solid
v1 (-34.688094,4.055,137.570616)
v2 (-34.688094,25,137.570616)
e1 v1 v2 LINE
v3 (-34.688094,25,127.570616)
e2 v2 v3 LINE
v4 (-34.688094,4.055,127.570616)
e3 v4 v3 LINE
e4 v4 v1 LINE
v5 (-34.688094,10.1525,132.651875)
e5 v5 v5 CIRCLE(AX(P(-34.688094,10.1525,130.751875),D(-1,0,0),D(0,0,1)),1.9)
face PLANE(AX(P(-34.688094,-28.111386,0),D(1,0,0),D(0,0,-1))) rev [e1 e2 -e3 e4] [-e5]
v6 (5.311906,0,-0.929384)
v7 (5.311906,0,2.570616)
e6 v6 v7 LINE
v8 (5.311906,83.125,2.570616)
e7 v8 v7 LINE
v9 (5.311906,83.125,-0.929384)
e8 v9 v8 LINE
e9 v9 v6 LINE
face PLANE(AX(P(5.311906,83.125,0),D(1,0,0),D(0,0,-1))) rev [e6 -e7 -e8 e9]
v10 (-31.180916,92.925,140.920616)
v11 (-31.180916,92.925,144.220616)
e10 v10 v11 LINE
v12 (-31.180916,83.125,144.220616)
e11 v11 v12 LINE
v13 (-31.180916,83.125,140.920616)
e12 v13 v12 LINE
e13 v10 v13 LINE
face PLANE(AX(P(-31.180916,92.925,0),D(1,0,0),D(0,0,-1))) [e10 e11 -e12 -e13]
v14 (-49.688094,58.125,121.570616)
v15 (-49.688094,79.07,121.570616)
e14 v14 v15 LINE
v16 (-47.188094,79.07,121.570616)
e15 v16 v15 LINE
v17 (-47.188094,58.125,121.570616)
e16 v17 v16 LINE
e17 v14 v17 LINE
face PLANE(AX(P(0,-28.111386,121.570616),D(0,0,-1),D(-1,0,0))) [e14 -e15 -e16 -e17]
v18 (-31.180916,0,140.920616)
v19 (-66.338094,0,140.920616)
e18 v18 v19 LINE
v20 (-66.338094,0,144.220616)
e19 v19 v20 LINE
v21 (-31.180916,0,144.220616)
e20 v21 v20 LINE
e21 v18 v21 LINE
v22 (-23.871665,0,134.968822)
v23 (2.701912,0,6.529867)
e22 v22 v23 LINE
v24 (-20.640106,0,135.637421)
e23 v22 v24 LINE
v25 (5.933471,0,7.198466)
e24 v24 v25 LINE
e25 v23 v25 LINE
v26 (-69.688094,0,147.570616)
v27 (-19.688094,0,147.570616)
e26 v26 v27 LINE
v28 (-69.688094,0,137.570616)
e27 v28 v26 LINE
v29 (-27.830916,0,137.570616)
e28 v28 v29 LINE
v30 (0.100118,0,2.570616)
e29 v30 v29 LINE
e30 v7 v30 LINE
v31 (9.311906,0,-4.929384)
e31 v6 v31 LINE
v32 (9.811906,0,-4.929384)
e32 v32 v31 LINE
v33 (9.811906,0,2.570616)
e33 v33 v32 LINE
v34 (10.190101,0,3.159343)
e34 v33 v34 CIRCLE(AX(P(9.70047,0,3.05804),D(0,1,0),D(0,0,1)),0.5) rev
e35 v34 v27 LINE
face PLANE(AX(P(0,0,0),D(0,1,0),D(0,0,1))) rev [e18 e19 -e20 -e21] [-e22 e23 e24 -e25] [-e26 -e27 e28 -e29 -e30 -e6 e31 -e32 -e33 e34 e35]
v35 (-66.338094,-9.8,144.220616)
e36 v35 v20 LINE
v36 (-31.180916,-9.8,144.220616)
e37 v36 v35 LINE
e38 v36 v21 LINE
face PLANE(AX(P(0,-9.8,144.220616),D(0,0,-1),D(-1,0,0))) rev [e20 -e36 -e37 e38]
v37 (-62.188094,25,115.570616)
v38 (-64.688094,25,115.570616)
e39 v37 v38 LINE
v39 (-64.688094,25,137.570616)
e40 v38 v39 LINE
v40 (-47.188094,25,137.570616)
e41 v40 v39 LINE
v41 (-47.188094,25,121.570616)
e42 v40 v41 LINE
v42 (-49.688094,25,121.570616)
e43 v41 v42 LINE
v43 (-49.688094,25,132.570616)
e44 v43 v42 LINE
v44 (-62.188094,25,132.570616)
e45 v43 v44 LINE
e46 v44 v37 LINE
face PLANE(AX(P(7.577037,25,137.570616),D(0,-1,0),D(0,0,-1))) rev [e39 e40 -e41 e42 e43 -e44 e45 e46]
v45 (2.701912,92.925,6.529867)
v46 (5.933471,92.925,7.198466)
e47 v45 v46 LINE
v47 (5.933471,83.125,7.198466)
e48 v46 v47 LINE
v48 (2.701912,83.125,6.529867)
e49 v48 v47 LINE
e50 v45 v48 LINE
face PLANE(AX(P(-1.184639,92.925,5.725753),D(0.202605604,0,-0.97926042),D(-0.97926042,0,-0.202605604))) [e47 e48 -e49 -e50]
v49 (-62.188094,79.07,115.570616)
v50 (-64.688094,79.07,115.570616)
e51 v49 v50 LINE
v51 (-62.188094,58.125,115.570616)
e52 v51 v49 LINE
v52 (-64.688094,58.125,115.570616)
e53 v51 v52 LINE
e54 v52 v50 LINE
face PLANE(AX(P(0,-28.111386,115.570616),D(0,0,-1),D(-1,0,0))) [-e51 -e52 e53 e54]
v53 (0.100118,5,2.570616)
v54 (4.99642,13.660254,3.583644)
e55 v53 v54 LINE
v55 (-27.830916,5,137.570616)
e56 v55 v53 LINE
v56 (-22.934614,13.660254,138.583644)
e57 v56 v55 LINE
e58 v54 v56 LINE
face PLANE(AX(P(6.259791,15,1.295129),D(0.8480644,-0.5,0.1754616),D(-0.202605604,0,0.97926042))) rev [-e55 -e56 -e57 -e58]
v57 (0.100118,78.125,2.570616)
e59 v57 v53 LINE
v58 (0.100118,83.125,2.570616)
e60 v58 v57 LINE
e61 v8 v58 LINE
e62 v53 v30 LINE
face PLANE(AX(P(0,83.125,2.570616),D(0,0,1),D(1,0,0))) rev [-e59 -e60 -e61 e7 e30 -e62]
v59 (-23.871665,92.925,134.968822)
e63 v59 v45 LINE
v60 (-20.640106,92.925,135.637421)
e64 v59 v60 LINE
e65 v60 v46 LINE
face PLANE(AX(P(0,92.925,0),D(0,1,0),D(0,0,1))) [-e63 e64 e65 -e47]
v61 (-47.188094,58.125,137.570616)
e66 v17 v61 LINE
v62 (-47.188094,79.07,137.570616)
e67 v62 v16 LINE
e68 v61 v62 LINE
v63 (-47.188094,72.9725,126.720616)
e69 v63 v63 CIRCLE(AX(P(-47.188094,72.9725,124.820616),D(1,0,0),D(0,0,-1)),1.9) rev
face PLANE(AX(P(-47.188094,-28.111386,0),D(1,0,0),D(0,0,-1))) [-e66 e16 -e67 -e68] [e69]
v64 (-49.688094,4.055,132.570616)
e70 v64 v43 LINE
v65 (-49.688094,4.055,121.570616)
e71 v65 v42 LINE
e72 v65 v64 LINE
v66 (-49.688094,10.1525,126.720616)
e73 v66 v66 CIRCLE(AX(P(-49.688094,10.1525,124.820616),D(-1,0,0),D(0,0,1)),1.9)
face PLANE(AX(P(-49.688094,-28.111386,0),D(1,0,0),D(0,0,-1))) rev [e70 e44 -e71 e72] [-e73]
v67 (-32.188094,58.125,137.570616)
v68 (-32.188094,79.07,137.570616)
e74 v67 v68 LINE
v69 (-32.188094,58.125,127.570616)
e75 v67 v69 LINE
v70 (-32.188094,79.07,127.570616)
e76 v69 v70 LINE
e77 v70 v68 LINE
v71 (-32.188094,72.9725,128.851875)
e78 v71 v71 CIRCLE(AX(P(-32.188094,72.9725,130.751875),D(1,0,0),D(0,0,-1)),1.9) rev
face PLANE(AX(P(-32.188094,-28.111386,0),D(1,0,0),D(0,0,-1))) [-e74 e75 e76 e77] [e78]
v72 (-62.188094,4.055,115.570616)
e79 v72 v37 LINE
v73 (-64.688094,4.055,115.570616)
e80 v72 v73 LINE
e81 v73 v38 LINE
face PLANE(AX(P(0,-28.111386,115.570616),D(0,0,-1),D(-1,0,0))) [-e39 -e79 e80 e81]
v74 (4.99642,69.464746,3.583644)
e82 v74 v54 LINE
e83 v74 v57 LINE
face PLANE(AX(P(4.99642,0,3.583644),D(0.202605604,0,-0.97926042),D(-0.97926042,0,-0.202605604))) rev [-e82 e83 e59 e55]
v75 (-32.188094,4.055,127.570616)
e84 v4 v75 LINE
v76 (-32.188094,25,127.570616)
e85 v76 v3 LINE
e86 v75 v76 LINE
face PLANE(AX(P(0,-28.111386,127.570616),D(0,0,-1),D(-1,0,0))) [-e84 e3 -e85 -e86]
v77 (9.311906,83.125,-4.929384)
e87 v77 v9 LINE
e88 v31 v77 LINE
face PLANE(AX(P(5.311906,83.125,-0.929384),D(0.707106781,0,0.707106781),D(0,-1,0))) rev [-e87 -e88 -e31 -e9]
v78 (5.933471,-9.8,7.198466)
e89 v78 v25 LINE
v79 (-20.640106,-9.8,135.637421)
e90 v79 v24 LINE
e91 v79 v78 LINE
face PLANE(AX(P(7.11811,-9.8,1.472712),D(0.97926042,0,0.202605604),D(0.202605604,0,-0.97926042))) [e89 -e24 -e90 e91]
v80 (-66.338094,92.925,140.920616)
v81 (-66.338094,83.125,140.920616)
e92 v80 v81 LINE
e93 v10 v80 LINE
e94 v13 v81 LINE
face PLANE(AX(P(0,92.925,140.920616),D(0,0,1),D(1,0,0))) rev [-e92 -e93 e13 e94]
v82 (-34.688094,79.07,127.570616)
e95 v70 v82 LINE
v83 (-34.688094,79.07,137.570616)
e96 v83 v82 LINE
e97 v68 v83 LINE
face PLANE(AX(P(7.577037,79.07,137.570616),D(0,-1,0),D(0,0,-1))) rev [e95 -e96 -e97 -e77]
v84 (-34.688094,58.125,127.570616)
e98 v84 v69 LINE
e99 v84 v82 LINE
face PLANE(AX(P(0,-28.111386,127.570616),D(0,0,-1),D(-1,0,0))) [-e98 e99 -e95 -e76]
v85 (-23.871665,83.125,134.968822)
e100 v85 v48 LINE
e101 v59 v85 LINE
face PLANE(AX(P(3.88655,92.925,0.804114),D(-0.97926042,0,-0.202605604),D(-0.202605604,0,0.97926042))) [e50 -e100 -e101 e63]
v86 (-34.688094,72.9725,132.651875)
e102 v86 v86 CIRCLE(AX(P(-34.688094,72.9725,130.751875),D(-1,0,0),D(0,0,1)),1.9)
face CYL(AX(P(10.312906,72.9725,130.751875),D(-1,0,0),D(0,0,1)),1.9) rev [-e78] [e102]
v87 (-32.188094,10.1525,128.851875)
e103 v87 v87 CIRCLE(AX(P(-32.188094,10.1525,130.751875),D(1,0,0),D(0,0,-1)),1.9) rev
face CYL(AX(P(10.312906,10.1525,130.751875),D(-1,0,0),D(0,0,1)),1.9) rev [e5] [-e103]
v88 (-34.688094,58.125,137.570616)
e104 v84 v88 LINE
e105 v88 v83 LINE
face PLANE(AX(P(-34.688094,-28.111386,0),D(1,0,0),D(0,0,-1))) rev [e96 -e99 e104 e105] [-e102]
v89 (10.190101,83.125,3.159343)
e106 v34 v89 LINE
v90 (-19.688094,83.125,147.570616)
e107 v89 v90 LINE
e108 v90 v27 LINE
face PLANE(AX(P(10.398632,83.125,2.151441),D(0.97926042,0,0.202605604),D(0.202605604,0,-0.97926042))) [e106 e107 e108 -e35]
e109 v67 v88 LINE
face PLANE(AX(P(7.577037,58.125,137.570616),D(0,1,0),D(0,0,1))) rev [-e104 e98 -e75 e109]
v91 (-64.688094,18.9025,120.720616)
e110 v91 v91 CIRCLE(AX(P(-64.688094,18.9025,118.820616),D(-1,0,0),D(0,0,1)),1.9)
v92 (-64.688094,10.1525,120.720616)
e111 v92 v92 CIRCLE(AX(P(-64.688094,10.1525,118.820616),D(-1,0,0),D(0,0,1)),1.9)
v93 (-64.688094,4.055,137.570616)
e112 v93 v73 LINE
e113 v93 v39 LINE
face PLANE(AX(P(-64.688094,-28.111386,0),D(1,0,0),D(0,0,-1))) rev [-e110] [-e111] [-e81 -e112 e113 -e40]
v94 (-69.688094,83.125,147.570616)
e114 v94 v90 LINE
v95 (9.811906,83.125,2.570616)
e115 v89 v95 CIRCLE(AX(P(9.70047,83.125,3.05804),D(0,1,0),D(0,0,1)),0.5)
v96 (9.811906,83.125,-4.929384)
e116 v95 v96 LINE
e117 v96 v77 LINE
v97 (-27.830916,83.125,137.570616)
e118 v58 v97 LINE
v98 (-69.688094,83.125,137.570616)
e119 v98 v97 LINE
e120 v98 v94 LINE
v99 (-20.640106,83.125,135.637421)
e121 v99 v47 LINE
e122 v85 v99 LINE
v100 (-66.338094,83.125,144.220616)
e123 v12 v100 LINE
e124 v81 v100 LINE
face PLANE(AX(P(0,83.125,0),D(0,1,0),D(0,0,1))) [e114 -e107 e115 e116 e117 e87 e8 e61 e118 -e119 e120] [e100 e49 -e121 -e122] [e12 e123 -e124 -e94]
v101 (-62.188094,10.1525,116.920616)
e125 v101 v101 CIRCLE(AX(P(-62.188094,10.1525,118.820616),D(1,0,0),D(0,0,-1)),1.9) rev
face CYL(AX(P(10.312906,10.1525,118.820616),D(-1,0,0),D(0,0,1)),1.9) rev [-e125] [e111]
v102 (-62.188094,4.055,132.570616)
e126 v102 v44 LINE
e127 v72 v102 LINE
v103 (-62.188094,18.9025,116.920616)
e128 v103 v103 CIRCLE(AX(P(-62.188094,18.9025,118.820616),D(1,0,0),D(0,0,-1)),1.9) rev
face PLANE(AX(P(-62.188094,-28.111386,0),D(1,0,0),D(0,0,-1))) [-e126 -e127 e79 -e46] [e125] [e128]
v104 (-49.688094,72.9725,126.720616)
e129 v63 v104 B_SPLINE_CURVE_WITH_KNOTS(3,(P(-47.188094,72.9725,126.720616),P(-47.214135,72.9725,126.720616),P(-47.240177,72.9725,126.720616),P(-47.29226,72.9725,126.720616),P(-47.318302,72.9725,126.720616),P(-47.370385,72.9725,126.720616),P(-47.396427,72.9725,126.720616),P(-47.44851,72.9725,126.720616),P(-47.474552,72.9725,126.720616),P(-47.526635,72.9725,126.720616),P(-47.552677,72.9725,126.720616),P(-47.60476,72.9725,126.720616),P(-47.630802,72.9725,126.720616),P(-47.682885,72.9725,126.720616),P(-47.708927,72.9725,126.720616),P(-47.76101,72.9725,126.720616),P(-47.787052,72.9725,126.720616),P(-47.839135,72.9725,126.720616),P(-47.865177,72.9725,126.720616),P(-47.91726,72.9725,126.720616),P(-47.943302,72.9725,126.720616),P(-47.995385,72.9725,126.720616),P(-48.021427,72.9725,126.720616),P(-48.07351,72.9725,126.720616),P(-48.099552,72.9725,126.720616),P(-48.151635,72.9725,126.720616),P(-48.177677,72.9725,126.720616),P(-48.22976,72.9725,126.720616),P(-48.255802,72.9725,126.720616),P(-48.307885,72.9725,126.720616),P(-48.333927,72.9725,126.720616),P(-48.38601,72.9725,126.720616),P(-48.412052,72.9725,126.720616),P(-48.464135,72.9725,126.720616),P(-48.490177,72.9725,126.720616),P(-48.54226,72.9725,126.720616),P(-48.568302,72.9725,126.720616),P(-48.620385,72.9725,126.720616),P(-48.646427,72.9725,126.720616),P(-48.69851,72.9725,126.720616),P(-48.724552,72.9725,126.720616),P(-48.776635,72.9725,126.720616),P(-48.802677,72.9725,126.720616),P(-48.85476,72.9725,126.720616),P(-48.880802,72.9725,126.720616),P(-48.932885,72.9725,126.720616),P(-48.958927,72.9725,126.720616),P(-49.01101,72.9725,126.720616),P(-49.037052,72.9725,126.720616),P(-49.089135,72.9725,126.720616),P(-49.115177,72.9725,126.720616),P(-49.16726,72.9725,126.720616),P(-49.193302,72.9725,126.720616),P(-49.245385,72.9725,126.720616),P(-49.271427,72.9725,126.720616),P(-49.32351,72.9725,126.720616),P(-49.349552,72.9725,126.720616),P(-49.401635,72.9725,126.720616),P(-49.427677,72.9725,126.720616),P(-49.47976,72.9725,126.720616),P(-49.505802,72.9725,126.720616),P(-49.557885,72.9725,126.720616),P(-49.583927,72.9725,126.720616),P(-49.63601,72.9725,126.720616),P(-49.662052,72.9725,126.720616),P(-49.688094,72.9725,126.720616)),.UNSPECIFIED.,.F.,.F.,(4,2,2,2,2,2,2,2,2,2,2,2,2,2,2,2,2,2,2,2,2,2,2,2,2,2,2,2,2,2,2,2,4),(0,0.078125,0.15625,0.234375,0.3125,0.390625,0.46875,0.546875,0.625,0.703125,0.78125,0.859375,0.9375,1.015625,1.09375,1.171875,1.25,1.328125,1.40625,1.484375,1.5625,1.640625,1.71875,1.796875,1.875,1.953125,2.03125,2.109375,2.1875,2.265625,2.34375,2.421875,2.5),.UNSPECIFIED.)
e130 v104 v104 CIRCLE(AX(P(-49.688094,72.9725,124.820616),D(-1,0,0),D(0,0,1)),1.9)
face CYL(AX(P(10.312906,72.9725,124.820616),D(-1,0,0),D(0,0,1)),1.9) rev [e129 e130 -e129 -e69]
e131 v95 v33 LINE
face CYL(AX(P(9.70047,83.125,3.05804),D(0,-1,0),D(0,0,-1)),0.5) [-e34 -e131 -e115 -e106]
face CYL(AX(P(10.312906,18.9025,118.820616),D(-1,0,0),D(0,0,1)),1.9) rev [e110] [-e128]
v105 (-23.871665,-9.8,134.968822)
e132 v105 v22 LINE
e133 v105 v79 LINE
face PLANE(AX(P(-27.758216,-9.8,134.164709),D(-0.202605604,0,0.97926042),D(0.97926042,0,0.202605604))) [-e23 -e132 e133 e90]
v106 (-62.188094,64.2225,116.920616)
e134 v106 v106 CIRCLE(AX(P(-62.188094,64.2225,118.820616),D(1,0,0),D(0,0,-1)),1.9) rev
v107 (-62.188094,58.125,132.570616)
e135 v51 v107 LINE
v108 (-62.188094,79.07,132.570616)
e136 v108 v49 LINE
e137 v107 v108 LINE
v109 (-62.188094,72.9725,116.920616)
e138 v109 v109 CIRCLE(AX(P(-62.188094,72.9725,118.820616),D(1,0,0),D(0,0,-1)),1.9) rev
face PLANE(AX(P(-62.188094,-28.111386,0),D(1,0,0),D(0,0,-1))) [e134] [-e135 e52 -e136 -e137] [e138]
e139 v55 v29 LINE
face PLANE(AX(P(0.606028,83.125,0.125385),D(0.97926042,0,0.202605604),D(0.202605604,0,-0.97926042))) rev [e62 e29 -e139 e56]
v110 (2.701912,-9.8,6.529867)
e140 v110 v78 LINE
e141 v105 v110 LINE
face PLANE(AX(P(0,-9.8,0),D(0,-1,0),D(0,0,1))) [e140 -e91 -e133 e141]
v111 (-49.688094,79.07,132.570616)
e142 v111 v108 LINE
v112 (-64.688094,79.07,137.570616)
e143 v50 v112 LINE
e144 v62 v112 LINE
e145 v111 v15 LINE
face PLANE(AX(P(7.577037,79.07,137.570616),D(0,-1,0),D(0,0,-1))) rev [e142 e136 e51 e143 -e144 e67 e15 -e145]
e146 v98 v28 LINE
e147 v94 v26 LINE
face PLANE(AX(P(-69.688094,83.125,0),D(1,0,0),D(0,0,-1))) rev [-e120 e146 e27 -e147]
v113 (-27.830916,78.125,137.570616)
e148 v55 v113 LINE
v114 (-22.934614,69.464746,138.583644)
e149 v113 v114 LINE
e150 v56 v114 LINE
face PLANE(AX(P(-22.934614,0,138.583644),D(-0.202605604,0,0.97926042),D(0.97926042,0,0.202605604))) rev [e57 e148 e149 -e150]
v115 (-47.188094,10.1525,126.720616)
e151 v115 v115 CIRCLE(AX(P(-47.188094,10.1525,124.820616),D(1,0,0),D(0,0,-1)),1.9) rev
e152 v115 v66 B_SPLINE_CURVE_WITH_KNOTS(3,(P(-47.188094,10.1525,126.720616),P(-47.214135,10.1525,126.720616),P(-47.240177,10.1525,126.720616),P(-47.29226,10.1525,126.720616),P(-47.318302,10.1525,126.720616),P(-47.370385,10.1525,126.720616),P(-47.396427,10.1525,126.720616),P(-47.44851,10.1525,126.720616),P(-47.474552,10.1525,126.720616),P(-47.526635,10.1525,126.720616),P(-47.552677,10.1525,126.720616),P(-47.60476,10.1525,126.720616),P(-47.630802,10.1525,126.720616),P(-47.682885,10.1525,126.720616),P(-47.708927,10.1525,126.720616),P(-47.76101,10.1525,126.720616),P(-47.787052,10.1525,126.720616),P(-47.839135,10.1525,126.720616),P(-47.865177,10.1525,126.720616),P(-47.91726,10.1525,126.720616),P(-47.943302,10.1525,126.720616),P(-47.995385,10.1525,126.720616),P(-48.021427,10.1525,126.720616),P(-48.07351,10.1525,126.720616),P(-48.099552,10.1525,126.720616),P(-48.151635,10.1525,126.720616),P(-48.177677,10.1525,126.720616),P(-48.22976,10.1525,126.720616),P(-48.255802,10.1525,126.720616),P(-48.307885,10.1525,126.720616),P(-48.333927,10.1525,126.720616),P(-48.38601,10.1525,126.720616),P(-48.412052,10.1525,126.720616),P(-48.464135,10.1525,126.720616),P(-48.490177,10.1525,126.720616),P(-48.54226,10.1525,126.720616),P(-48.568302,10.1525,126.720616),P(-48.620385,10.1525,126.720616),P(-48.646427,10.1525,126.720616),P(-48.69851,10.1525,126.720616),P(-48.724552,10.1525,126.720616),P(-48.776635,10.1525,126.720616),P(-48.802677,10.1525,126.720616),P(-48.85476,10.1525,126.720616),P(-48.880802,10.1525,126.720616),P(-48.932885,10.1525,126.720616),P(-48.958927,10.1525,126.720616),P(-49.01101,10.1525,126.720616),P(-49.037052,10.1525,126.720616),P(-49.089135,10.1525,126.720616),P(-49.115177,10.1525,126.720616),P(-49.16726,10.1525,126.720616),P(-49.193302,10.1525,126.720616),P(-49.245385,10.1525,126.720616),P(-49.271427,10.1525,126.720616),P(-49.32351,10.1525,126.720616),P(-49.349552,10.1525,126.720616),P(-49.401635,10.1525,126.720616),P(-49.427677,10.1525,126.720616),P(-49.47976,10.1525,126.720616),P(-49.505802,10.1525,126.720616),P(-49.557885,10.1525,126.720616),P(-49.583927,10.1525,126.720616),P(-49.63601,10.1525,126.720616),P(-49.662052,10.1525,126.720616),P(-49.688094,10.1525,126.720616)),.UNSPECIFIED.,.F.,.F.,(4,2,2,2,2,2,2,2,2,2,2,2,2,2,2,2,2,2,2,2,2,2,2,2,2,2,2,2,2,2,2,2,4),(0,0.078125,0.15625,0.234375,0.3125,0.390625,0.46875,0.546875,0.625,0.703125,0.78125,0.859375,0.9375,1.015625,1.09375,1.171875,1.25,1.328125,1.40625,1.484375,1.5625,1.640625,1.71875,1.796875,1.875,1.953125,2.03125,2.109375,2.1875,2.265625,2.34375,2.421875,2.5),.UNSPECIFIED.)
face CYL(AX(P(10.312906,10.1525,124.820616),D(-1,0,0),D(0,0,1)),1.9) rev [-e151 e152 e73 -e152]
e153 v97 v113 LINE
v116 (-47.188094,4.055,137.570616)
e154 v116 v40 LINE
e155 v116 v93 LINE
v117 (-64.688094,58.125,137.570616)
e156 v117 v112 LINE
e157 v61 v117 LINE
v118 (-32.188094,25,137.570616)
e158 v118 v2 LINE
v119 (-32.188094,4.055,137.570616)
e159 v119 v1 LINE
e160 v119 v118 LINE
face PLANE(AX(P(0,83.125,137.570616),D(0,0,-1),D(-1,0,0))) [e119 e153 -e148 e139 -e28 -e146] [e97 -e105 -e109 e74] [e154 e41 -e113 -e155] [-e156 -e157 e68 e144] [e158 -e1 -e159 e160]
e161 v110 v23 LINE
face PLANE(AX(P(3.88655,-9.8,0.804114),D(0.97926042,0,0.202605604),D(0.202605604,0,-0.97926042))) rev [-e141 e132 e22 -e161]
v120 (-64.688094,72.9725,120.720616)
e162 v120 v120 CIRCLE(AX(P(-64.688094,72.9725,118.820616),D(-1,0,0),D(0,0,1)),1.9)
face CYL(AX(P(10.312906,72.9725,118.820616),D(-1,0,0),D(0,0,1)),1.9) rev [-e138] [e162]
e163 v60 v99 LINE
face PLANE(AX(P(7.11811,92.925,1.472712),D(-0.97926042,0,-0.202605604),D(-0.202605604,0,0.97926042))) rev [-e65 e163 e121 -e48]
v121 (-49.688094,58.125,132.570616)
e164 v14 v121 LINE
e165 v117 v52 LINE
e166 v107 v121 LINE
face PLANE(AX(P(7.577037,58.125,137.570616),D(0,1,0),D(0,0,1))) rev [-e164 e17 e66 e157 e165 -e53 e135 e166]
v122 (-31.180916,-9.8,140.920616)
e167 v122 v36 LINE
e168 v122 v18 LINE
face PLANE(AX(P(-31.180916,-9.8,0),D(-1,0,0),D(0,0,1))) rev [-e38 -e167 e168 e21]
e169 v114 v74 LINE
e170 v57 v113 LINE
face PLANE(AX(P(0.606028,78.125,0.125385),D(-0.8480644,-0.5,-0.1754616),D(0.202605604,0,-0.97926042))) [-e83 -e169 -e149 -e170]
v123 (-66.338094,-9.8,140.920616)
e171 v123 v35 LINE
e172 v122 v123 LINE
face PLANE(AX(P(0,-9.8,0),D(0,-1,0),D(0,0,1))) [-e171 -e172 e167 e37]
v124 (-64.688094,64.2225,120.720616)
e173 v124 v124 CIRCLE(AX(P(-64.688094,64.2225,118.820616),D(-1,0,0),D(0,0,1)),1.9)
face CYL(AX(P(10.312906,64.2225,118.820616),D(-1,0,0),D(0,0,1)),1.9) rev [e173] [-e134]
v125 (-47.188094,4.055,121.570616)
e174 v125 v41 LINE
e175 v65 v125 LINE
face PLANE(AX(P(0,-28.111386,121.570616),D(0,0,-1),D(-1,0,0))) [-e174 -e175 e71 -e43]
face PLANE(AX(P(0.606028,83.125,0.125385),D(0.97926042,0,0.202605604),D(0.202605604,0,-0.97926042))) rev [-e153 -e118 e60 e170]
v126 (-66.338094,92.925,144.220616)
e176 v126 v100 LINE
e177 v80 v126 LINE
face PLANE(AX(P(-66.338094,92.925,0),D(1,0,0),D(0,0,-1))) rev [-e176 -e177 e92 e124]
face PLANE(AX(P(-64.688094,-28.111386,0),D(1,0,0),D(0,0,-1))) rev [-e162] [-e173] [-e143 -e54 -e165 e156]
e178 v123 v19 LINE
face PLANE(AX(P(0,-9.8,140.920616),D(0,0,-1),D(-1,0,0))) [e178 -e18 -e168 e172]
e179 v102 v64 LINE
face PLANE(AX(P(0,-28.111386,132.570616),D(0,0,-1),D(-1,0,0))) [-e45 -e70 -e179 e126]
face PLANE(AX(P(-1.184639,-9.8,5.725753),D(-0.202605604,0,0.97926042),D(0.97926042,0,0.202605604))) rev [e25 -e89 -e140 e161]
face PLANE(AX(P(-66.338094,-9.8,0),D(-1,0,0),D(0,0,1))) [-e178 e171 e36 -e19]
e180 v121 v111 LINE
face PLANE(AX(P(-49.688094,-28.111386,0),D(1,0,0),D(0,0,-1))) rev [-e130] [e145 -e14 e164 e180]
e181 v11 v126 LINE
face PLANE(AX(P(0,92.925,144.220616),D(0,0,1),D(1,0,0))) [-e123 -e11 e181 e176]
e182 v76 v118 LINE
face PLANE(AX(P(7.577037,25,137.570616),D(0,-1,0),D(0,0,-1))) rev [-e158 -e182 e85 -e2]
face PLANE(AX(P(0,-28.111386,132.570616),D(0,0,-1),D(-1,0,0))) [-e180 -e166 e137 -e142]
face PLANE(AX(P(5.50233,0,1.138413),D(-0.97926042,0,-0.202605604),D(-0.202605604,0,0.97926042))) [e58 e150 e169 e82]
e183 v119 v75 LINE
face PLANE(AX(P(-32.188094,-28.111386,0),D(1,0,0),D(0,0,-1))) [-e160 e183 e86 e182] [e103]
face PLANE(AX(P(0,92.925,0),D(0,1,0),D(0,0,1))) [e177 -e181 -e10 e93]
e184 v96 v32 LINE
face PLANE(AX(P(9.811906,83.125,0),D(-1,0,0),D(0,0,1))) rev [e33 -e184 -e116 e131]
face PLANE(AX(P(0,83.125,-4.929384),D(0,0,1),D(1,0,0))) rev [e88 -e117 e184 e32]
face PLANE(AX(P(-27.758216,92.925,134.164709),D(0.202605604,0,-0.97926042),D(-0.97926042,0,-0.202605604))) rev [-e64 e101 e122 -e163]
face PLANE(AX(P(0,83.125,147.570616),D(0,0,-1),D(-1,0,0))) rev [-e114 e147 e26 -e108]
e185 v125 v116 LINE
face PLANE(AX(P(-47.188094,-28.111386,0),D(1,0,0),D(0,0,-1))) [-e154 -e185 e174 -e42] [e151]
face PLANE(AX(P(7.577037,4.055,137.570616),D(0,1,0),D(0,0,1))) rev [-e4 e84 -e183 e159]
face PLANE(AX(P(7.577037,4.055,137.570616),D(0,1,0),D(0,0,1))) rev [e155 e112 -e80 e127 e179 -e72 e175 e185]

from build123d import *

# Parameters (mm, degrees)
BOSS_EXTRUDE1_DEPTH = 83.125
SKETCH2_W           = 35.157177314
SKETCH2_H           = 3.3
BOSS_EXTRUDE2_DEPTH = 9.8
SKETCH7_W           = 2.5
SKETCH7_H           = 10
BOSS_EXTRUDE4_DEPTH = 83.125
CUT_EXTRUDE5_REACH  = 186.424
SKETCH8_R           = 1.9
CUT_EXTRUDE6_REACH  = 191.835
SKETCH9_R           = 1.9
CUT_EXTRUDE9_REACH  = 182.103
SKETCH12_R          = 1.9
CUT_EXTRUDE7_REACH  = 191.835
SKETCH10_W          = 33.125
SKETCH10_H          = 22
SKETCH10_W_2        = 4.055
SKETCH11_W          = 53.125
SKETCH11_H          = 124.429937858
SKETCH11_H_2        = 13.429202889
CUT_EXTRUDE8_DEPTH  = 5
CHAMFER1_SIZE       = 4
FILLET1_R           = 0.5
CHAMFER2_SIZE       = 10
CHAMFER2_SIZE_2     = 5.773502692


with BuildPart() as part:
    # Sketch1 → Boss-Extrude1 (new body)
    with BuildSketch(Plane(origin=(0, 0, 0), x_dir=(-1, 0, 0), z_dir=(0, 1, 0))):
        Polygon((19.688093764, 147.570616058), (-10.311906236, 2.570616058), (-9.811906236, 2.570616058), (-9.811906236, -4.929383942), (-5.311906236, -4.929383942), (-5.311906236, 2.570616058), (-0.100118033, 2.570616058), (27.83091645, 137.570616058), (69.688093764, 137.570616058), (69.688093764, 147.570616058), align=None)
    extrude(amount=BOSS_EXTRUDE1_DEPTH)

    # Sketch2 → Boss-Extrude2 (add)
    with BuildSketch(Plane(origin=(0, 83.125, 0), x_dir=(-1, 0, 0), z_dir=(0, 1, 0))):
        Polygon((23.871665271, 134.968822427), (-2.701911664, 6.529867237), (-5.933471049, 7.198465731), (20.640105887, 135.63742092), align=None)
        with Locations((48.759505107, 142.570616058)):
            Rectangle(SKETCH2_W, SKETCH2_H)
    boss_extrude2 = extrude(amount=BOSS_EXTRUDE2_DEPTH)

    # Mirror1: Boss-Extrude2 across plane
    add(boss_extrude2.mirror(Plane.ZX.offset(41.5625)))

    # Sketch7 → Boss-Extrude4 (add)
    with BuildSketch(Plane(origin=(0, 83.125, 0), x_dir=(-1, 0, 0), z_dir=(0, 1, 0))):
        Polygon((64.688093764, 137.570616058), (47.188093764, 137.570616058), (47.188093764, 121.570616058), (49.688093764, 121.570616058), (49.688093764, 132.570616058), (62.188093764, 132.570616058), (62.188093764, 115.570616058), (64.688093764, 115.570616058), align=None)
        with Locations((33.438093764, 132.570616058)):
            Rectangle(SKETCH7_W, SKETCH7_H)
    extrude(amount=-BOSS_EXTRUDE4_DEPTH)

    # Sketch8 → Cut-Extrude5 (cut, up to next)
    with BuildSketch(Plane(origin=(-49.688093764, 0, 0), x_dir=(0, -1, 0), z_dir=(-1, 0, 0)), mode=Mode.PRIVATE) as cut_extrude5_sk1:
        with Locations(Location((-72.9725, 124.820616058, 0), (0, 0, 90))):
            Circle(SKETCH8_R)
    cut_extrude5_tool1 = extrude(cut_extrude5_sk1.sketch, amount=-CUT_EXTRUDE5_REACH, mode=Mode.PRIVATE) & part.part
    # Sketch8 → Cut-Extrude5 (cut, up to next)
    with BuildSketch(Plane(origin=(-49.688093764, 0, 0), x_dir=(0, -1, 0), z_dir=(-1, 0, 0)), mode=Mode.PRIVATE) as cut_extrude5_sk2:
        with Locations(Location((-10.1525, 124.820616058, 0), (0, 0, 90))):
            Circle(SKETCH8_R)
    cut_extrude5_tool2 = extrude(cut_extrude5_sk2.sketch, amount=-CUT_EXTRUDE5_REACH, mode=Mode.PRIVATE) & part.part
    add(cut_extrude5_tool1.solids().sort_by_distance((-49.688094, 72.9725, 124.820616))[0], mode=Mode.SUBTRACT)
    add(cut_extrude5_tool2.solids().sort_by_distance((-49.688094, 10.1525, 124.820616))[0], mode=Mode.SUBTRACT)

    # Sketch9 → Cut-Extrude6 (cut, up to next)
    with BuildSketch(Plane(origin=(-64.688093764, 0, 0), x_dir=(0, -1, 0), z_dir=(-1, 0, 0)), mode=Mode.PRIVATE) as cut_extrude6_sk1:
        with Locations(Location((-72.9725, 118.820616058, 0), (0, 0, 90))):
            Circle(SKETCH9_R)
    cut_extrude6_tool1 = extrude(cut_extrude6_sk1.sketch, amount=-CUT_EXTRUDE6_REACH, mode=Mode.PRIVATE) & part.part
    # Sketch9 → Cut-Extrude6 (cut, up to next)
    with BuildSketch(Plane(origin=(-64.688093764, 0, 0), x_dir=(0, -1, 0), z_dir=(-1, 0, 0)), mode=Mode.PRIVATE) as cut_extrude6_sk2:
        with Locations(Location((-18.9025, 118.820616058, 0), (0, 0, 90))):
            Circle(SKETCH9_R)
    cut_extrude6_tool2 = extrude(cut_extrude6_sk2.sketch, amount=-CUT_EXTRUDE6_REACH, mode=Mode.PRIVATE) & part.part
    # Sketch9 → Cut-Extrude6 (cut, up to next)
    with BuildSketch(Plane(origin=(-64.688093764, 0, 0), x_dir=(0, -1, 0), z_dir=(-1, 0, 0)), mode=Mode.PRIVATE) as cut_extrude6_sk3:
        with Locations(Location((-10.1525, 118.820616058, 0), (0, 0, 90))):
            Circle(SKETCH9_R)
    cut_extrude6_tool3 = extrude(cut_extrude6_sk3.sketch, amount=-CUT_EXTRUDE6_REACH, mode=Mode.PRIVATE) & part.part
    # Sketch9 → Cut-Extrude6 (cut, up to next)
    with BuildSketch(Plane(origin=(-64.688093764, 0, 0), x_dir=(0, -1, 0), z_dir=(-1, 0, 0)), mode=Mode.PRIVATE) as cut_extrude6_sk4:
        with Locations(Location((-64.2225, 118.820616058, 0), (0, 0, 90))):
            Circle(SKETCH9_R)
    cut_extrude6_tool4 = extrude(cut_extrude6_sk4.sketch, amount=-CUT_EXTRUDE6_REACH, mode=Mode.PRIVATE) & part.part
    add(cut_extrude6_tool1.solids().sort_by_distance((-64.688094, 72.9725, 118.820616))[0], mode=Mode.SUBTRACT)
    add(cut_extrude6_tool2.solids().sort_by_distance((-64.688094, 18.9025, 118.820616))[0], mode=Mode.SUBTRACT)
    add(cut_extrude6_tool3.solids().sort_by_distance((-64.688094, 10.1525, 118.820616))[0], mode=Mode.SUBTRACT)
    add(cut_extrude6_tool4.solids().sort_by_distance((-64.688094, 64.2225, 118.820616))[0], mode=Mode.SUBTRACT)

    # Sketch12 → Cut-Extrude9 (cut, up to next)
    with BuildSketch(Plane(origin=(-34.688093764, 0, 0), x_dir=(0, -1, 0), z_dir=(-1, 0, 0)), mode=Mode.PRIVATE) as cut_extrude9_sk1:
        with Locations(Location((-72.9725, 130.751875225, 0), (0, 0, 90))):
            Circle(SKETCH12_R)
    cut_extrude9_tool1 = extrude(cut_extrude9_sk1.sketch, amount=-CUT_EXTRUDE9_REACH, mode=Mode.PRIVATE) & part.part
    # Sketch12 → Cut-Extrude9 (cut, up to next)
    with BuildSketch(Plane(origin=(-34.688093764, 0, 0), x_dir=(0, -1, 0), z_dir=(-1, 0, 0)), mode=Mode.PRIVATE) as cut_extrude9_sk2:
        with Locations(Location((-10.1525, 130.751875225, 0), (0, 0, 90))):
            Circle(SKETCH12_R)
    cut_extrude9_tool2 = extrude(cut_extrude9_sk2.sketch, amount=-CUT_EXTRUDE9_REACH, mode=Mode.PRIVATE) & part.part
    add(cut_extrude9_tool1.solids().sort_by_distance((-34.688094, 72.9725, 130.751875))[0], mode=Mode.SUBTRACT)
    add(cut_extrude9_tool2.solids().sort_by_distance((-34.688094, 10.1525, 130.751875))[0], mode=Mode.SUBTRACT)

    # Cut-Extrude7: up to this face of the body (flat: up to its plane)
    cut_extrude7_end = Plane(part.part.faces().sort_by_distance((-32.188093764, 41.5625, 132.621636181))[0])
    # Sketch10 → Cut-Extrude7 (cut, up to the picked face)
    with BuildSketch(Plane(origin=(-64.688093764, 0, 0), x_dir=(0, -1, 0), z_dir=(-1, 0, 0)), mode=Mode.PRIVATE) as cut_extrude7_sk1:
        with Locations((-41.5625, 126.570616058)):
            Rectangle(SKETCH10_W, SKETCH10_H)
    cut_extrude7_tool1 = split(extrude(cut_extrude7_sk1.sketch, amount=-CUT_EXTRUDE7_REACH, mode=Mode.PRIVATE), bisect_by=cut_extrude7_end, keep=Keep.BOTH, mode=Mode.PRIVATE)
    # Sketch10 → Cut-Extrude7 (cut, up to the picked face)
    with BuildSketch(Plane(origin=(-64.688093764, 0, 0), x_dir=(0, -1, 0), z_dir=(-1, 0, 0)), mode=Mode.PRIVATE) as cut_extrude7_sk2:
        with Locations((-81.0975, 126.570616058)):
            Rectangle(SKETCH10_W_2, SKETCH10_H)
    cut_extrude7_tool2 = split(extrude(cut_extrude7_sk2.sketch, amount=-CUT_EXTRUDE7_REACH, mode=Mode.PRIVATE), bisect_by=cut_extrude7_end, keep=Keep.BOTH, mode=Mode.PRIVATE)
    # Sketch10 → Cut-Extrude7 (cut, up to the picked face)
    with BuildSketch(Plane(origin=(-64.688093764, 0, 0), x_dir=(0, -1, 0), z_dir=(-1, 0, 0)), mode=Mode.PRIVATE) as cut_extrude7_sk3:
        with Locations((-2.0275, 126.570616058)):
            Rectangle(SKETCH10_W_2, SKETCH10_H)
    cut_extrude7_tool3 = split(extrude(cut_extrude7_sk3.sketch, amount=-CUT_EXTRUDE7_REACH, mode=Mode.PRIVATE), bisect_by=cut_extrude7_end, keep=Keep.BOTH, mode=Mode.PRIVATE)
    add(cut_extrude7_tool1.solids().sort_by(Axis((-64.688094, 41.5625, 126.570616), (1, 0, 0)))[0], mode=Mode.SUBTRACT)
    add(cut_extrude7_tool2.solids().sort_by(Axis((-64.688094, 81.0975, 126.570616), (1, 0, 0)))[0], mode=Mode.SUBTRACT)
    add(cut_extrude7_tool3.solids().sort_by(Axis((-64.688094, 2.0275, 126.570616), (1, 0, 0)))[0], mode=Mode.SUBTRACT)

    # Sketch11 → Cut-Extrude8 (cut)
    with BuildSketch(Plane(origin=(0.60602789, 0, 0.125385081), x_dir=(0, -1, 0), z_dir=(-0.9792604195071029, 0, -0.20260560403595218))):
        with Locations((-41.5625, 78.141189903)):
            Rectangle(SKETCH11_W, SKETCH11_H)
        with Locations((-41.5625, 9.21161953)):
            Rectangle(SKETCH11_W, SKETCH11_H_2)
    extrude(amount=-CUT_EXTRUDE8_DEPTH, mode=Mode.SUBTRACT)

    # Chamfer1
    chamfer1_edges = [part.edges().sort_by_distance(p)[0] for p in [
        (5.311906236, 41.5625, -4.929383942),
    ]]
    chamfer(chamfer1_edges, length=CHAMFER1_SIZE)

    # Fillet1
    # the kernel refuses this fillet: 0.5 mm, written as the material it takes off along each edge
    with BuildSketch(Plane(origin=(10.311906236, -1.502988145, 2.570616058), x_dir=(-1, 0, 0), z_dir=(0, 1, 0))) as fillet1_piece_1:
        with BuildLine():
            CenterArc((0.611435738, 0.487423918), FILLET1_R, 168.310630825, 88.811624366)
            Line((0.121805528, 0.58872672), (0.112012924, 0.590752776))
            Line((0.112012924, 0.590752776), (-0.009792604, 0.002026056))
            Line((-0.009792604, 0.002026056), (0, -0.01))
            ThreePointArc((0, -0.01), (0.25, -0.01), (0.497771285, -0.009748478))
            Line((0.497771285, -0.009748478), (0.5, 0))
        make_face()
    extrude(amount=86.13097629, mode=Mode.SUBTRACT)

    # Chamfer2
    # the kernel refuses this chamfer: 10, 5.773502692 mm, written as the material it takes off along each edge
    with BuildSketch(Plane(origin=(0.100118033, 68.125, 2.570616058), x_dir=(-0.018925936601608705, 0.9998132206222079, -0.003915711021022488), z_dir=(-0.20260560403595218, 0, 0.9792604195071029))) as chamfer2_piece_1_section:
        Polygon((CHAMFER2_SIZE * 0.999813220622, -CHAMFER2_SIZE * 0.0193267656127), (-CHAMFER2_SIZE_2 * 0.0193267656124, -CHAMFER2_SIZE_2 * 0.999813220604), (0, 0), align=None)
    chamfer2_piece_1 = extrude(amount=137.859140746, mode=Mode.PRIVATE)
    chamfer2_piece_1 = split(chamfer2_piece_1, bisect_by=Plane(origin=(4.844173208, 72.725966315, 4.319504201), z_dir=(-0.9792604195071029, 0, -0.20260560403595218)), keep=Keep.TOP, mode=Mode.PRIVATE)
    add(chamfer2_piece_1, mode=Mode.SUBTRACT)
    with BuildSketch(Plane(origin=(0.100118033, 15, 2.570616058), x_dir=(-0.01892593660160869, -0.9998132206222079, -0.0039157110210224855), z_dir=(-0.20260560403595218, 0, 0.9792604195071029))) as chamfer2_piece_2_section:
        Polygon((CHAMFER2_SIZE * 0.999813220622, CHAMFER2_SIZE * 0.0193267656127), (-CHAMFER2_SIZE_2 * 0.0193267656124, CHAMFER2_SIZE_2 * 0.999813220604), (0, 0), align=None)
    chamfer2_piece_2 = extrude(amount=137.859140746, mode=Mode.PRIVATE)
    chamfer2_piece_2 = split(chamfer2_piece_2, bisect_by=Plane(origin=(4.844173208, 10.399033685, 4.319504201), z_dir=(-0.9792604195071029, 0, -0.20260560403595218)), keep=Keep.TOP, mode=Mode.PRIVATE)
    add(chamfer2_piece_2, mode=Mode.SUBTRACT)


solid = part.part
